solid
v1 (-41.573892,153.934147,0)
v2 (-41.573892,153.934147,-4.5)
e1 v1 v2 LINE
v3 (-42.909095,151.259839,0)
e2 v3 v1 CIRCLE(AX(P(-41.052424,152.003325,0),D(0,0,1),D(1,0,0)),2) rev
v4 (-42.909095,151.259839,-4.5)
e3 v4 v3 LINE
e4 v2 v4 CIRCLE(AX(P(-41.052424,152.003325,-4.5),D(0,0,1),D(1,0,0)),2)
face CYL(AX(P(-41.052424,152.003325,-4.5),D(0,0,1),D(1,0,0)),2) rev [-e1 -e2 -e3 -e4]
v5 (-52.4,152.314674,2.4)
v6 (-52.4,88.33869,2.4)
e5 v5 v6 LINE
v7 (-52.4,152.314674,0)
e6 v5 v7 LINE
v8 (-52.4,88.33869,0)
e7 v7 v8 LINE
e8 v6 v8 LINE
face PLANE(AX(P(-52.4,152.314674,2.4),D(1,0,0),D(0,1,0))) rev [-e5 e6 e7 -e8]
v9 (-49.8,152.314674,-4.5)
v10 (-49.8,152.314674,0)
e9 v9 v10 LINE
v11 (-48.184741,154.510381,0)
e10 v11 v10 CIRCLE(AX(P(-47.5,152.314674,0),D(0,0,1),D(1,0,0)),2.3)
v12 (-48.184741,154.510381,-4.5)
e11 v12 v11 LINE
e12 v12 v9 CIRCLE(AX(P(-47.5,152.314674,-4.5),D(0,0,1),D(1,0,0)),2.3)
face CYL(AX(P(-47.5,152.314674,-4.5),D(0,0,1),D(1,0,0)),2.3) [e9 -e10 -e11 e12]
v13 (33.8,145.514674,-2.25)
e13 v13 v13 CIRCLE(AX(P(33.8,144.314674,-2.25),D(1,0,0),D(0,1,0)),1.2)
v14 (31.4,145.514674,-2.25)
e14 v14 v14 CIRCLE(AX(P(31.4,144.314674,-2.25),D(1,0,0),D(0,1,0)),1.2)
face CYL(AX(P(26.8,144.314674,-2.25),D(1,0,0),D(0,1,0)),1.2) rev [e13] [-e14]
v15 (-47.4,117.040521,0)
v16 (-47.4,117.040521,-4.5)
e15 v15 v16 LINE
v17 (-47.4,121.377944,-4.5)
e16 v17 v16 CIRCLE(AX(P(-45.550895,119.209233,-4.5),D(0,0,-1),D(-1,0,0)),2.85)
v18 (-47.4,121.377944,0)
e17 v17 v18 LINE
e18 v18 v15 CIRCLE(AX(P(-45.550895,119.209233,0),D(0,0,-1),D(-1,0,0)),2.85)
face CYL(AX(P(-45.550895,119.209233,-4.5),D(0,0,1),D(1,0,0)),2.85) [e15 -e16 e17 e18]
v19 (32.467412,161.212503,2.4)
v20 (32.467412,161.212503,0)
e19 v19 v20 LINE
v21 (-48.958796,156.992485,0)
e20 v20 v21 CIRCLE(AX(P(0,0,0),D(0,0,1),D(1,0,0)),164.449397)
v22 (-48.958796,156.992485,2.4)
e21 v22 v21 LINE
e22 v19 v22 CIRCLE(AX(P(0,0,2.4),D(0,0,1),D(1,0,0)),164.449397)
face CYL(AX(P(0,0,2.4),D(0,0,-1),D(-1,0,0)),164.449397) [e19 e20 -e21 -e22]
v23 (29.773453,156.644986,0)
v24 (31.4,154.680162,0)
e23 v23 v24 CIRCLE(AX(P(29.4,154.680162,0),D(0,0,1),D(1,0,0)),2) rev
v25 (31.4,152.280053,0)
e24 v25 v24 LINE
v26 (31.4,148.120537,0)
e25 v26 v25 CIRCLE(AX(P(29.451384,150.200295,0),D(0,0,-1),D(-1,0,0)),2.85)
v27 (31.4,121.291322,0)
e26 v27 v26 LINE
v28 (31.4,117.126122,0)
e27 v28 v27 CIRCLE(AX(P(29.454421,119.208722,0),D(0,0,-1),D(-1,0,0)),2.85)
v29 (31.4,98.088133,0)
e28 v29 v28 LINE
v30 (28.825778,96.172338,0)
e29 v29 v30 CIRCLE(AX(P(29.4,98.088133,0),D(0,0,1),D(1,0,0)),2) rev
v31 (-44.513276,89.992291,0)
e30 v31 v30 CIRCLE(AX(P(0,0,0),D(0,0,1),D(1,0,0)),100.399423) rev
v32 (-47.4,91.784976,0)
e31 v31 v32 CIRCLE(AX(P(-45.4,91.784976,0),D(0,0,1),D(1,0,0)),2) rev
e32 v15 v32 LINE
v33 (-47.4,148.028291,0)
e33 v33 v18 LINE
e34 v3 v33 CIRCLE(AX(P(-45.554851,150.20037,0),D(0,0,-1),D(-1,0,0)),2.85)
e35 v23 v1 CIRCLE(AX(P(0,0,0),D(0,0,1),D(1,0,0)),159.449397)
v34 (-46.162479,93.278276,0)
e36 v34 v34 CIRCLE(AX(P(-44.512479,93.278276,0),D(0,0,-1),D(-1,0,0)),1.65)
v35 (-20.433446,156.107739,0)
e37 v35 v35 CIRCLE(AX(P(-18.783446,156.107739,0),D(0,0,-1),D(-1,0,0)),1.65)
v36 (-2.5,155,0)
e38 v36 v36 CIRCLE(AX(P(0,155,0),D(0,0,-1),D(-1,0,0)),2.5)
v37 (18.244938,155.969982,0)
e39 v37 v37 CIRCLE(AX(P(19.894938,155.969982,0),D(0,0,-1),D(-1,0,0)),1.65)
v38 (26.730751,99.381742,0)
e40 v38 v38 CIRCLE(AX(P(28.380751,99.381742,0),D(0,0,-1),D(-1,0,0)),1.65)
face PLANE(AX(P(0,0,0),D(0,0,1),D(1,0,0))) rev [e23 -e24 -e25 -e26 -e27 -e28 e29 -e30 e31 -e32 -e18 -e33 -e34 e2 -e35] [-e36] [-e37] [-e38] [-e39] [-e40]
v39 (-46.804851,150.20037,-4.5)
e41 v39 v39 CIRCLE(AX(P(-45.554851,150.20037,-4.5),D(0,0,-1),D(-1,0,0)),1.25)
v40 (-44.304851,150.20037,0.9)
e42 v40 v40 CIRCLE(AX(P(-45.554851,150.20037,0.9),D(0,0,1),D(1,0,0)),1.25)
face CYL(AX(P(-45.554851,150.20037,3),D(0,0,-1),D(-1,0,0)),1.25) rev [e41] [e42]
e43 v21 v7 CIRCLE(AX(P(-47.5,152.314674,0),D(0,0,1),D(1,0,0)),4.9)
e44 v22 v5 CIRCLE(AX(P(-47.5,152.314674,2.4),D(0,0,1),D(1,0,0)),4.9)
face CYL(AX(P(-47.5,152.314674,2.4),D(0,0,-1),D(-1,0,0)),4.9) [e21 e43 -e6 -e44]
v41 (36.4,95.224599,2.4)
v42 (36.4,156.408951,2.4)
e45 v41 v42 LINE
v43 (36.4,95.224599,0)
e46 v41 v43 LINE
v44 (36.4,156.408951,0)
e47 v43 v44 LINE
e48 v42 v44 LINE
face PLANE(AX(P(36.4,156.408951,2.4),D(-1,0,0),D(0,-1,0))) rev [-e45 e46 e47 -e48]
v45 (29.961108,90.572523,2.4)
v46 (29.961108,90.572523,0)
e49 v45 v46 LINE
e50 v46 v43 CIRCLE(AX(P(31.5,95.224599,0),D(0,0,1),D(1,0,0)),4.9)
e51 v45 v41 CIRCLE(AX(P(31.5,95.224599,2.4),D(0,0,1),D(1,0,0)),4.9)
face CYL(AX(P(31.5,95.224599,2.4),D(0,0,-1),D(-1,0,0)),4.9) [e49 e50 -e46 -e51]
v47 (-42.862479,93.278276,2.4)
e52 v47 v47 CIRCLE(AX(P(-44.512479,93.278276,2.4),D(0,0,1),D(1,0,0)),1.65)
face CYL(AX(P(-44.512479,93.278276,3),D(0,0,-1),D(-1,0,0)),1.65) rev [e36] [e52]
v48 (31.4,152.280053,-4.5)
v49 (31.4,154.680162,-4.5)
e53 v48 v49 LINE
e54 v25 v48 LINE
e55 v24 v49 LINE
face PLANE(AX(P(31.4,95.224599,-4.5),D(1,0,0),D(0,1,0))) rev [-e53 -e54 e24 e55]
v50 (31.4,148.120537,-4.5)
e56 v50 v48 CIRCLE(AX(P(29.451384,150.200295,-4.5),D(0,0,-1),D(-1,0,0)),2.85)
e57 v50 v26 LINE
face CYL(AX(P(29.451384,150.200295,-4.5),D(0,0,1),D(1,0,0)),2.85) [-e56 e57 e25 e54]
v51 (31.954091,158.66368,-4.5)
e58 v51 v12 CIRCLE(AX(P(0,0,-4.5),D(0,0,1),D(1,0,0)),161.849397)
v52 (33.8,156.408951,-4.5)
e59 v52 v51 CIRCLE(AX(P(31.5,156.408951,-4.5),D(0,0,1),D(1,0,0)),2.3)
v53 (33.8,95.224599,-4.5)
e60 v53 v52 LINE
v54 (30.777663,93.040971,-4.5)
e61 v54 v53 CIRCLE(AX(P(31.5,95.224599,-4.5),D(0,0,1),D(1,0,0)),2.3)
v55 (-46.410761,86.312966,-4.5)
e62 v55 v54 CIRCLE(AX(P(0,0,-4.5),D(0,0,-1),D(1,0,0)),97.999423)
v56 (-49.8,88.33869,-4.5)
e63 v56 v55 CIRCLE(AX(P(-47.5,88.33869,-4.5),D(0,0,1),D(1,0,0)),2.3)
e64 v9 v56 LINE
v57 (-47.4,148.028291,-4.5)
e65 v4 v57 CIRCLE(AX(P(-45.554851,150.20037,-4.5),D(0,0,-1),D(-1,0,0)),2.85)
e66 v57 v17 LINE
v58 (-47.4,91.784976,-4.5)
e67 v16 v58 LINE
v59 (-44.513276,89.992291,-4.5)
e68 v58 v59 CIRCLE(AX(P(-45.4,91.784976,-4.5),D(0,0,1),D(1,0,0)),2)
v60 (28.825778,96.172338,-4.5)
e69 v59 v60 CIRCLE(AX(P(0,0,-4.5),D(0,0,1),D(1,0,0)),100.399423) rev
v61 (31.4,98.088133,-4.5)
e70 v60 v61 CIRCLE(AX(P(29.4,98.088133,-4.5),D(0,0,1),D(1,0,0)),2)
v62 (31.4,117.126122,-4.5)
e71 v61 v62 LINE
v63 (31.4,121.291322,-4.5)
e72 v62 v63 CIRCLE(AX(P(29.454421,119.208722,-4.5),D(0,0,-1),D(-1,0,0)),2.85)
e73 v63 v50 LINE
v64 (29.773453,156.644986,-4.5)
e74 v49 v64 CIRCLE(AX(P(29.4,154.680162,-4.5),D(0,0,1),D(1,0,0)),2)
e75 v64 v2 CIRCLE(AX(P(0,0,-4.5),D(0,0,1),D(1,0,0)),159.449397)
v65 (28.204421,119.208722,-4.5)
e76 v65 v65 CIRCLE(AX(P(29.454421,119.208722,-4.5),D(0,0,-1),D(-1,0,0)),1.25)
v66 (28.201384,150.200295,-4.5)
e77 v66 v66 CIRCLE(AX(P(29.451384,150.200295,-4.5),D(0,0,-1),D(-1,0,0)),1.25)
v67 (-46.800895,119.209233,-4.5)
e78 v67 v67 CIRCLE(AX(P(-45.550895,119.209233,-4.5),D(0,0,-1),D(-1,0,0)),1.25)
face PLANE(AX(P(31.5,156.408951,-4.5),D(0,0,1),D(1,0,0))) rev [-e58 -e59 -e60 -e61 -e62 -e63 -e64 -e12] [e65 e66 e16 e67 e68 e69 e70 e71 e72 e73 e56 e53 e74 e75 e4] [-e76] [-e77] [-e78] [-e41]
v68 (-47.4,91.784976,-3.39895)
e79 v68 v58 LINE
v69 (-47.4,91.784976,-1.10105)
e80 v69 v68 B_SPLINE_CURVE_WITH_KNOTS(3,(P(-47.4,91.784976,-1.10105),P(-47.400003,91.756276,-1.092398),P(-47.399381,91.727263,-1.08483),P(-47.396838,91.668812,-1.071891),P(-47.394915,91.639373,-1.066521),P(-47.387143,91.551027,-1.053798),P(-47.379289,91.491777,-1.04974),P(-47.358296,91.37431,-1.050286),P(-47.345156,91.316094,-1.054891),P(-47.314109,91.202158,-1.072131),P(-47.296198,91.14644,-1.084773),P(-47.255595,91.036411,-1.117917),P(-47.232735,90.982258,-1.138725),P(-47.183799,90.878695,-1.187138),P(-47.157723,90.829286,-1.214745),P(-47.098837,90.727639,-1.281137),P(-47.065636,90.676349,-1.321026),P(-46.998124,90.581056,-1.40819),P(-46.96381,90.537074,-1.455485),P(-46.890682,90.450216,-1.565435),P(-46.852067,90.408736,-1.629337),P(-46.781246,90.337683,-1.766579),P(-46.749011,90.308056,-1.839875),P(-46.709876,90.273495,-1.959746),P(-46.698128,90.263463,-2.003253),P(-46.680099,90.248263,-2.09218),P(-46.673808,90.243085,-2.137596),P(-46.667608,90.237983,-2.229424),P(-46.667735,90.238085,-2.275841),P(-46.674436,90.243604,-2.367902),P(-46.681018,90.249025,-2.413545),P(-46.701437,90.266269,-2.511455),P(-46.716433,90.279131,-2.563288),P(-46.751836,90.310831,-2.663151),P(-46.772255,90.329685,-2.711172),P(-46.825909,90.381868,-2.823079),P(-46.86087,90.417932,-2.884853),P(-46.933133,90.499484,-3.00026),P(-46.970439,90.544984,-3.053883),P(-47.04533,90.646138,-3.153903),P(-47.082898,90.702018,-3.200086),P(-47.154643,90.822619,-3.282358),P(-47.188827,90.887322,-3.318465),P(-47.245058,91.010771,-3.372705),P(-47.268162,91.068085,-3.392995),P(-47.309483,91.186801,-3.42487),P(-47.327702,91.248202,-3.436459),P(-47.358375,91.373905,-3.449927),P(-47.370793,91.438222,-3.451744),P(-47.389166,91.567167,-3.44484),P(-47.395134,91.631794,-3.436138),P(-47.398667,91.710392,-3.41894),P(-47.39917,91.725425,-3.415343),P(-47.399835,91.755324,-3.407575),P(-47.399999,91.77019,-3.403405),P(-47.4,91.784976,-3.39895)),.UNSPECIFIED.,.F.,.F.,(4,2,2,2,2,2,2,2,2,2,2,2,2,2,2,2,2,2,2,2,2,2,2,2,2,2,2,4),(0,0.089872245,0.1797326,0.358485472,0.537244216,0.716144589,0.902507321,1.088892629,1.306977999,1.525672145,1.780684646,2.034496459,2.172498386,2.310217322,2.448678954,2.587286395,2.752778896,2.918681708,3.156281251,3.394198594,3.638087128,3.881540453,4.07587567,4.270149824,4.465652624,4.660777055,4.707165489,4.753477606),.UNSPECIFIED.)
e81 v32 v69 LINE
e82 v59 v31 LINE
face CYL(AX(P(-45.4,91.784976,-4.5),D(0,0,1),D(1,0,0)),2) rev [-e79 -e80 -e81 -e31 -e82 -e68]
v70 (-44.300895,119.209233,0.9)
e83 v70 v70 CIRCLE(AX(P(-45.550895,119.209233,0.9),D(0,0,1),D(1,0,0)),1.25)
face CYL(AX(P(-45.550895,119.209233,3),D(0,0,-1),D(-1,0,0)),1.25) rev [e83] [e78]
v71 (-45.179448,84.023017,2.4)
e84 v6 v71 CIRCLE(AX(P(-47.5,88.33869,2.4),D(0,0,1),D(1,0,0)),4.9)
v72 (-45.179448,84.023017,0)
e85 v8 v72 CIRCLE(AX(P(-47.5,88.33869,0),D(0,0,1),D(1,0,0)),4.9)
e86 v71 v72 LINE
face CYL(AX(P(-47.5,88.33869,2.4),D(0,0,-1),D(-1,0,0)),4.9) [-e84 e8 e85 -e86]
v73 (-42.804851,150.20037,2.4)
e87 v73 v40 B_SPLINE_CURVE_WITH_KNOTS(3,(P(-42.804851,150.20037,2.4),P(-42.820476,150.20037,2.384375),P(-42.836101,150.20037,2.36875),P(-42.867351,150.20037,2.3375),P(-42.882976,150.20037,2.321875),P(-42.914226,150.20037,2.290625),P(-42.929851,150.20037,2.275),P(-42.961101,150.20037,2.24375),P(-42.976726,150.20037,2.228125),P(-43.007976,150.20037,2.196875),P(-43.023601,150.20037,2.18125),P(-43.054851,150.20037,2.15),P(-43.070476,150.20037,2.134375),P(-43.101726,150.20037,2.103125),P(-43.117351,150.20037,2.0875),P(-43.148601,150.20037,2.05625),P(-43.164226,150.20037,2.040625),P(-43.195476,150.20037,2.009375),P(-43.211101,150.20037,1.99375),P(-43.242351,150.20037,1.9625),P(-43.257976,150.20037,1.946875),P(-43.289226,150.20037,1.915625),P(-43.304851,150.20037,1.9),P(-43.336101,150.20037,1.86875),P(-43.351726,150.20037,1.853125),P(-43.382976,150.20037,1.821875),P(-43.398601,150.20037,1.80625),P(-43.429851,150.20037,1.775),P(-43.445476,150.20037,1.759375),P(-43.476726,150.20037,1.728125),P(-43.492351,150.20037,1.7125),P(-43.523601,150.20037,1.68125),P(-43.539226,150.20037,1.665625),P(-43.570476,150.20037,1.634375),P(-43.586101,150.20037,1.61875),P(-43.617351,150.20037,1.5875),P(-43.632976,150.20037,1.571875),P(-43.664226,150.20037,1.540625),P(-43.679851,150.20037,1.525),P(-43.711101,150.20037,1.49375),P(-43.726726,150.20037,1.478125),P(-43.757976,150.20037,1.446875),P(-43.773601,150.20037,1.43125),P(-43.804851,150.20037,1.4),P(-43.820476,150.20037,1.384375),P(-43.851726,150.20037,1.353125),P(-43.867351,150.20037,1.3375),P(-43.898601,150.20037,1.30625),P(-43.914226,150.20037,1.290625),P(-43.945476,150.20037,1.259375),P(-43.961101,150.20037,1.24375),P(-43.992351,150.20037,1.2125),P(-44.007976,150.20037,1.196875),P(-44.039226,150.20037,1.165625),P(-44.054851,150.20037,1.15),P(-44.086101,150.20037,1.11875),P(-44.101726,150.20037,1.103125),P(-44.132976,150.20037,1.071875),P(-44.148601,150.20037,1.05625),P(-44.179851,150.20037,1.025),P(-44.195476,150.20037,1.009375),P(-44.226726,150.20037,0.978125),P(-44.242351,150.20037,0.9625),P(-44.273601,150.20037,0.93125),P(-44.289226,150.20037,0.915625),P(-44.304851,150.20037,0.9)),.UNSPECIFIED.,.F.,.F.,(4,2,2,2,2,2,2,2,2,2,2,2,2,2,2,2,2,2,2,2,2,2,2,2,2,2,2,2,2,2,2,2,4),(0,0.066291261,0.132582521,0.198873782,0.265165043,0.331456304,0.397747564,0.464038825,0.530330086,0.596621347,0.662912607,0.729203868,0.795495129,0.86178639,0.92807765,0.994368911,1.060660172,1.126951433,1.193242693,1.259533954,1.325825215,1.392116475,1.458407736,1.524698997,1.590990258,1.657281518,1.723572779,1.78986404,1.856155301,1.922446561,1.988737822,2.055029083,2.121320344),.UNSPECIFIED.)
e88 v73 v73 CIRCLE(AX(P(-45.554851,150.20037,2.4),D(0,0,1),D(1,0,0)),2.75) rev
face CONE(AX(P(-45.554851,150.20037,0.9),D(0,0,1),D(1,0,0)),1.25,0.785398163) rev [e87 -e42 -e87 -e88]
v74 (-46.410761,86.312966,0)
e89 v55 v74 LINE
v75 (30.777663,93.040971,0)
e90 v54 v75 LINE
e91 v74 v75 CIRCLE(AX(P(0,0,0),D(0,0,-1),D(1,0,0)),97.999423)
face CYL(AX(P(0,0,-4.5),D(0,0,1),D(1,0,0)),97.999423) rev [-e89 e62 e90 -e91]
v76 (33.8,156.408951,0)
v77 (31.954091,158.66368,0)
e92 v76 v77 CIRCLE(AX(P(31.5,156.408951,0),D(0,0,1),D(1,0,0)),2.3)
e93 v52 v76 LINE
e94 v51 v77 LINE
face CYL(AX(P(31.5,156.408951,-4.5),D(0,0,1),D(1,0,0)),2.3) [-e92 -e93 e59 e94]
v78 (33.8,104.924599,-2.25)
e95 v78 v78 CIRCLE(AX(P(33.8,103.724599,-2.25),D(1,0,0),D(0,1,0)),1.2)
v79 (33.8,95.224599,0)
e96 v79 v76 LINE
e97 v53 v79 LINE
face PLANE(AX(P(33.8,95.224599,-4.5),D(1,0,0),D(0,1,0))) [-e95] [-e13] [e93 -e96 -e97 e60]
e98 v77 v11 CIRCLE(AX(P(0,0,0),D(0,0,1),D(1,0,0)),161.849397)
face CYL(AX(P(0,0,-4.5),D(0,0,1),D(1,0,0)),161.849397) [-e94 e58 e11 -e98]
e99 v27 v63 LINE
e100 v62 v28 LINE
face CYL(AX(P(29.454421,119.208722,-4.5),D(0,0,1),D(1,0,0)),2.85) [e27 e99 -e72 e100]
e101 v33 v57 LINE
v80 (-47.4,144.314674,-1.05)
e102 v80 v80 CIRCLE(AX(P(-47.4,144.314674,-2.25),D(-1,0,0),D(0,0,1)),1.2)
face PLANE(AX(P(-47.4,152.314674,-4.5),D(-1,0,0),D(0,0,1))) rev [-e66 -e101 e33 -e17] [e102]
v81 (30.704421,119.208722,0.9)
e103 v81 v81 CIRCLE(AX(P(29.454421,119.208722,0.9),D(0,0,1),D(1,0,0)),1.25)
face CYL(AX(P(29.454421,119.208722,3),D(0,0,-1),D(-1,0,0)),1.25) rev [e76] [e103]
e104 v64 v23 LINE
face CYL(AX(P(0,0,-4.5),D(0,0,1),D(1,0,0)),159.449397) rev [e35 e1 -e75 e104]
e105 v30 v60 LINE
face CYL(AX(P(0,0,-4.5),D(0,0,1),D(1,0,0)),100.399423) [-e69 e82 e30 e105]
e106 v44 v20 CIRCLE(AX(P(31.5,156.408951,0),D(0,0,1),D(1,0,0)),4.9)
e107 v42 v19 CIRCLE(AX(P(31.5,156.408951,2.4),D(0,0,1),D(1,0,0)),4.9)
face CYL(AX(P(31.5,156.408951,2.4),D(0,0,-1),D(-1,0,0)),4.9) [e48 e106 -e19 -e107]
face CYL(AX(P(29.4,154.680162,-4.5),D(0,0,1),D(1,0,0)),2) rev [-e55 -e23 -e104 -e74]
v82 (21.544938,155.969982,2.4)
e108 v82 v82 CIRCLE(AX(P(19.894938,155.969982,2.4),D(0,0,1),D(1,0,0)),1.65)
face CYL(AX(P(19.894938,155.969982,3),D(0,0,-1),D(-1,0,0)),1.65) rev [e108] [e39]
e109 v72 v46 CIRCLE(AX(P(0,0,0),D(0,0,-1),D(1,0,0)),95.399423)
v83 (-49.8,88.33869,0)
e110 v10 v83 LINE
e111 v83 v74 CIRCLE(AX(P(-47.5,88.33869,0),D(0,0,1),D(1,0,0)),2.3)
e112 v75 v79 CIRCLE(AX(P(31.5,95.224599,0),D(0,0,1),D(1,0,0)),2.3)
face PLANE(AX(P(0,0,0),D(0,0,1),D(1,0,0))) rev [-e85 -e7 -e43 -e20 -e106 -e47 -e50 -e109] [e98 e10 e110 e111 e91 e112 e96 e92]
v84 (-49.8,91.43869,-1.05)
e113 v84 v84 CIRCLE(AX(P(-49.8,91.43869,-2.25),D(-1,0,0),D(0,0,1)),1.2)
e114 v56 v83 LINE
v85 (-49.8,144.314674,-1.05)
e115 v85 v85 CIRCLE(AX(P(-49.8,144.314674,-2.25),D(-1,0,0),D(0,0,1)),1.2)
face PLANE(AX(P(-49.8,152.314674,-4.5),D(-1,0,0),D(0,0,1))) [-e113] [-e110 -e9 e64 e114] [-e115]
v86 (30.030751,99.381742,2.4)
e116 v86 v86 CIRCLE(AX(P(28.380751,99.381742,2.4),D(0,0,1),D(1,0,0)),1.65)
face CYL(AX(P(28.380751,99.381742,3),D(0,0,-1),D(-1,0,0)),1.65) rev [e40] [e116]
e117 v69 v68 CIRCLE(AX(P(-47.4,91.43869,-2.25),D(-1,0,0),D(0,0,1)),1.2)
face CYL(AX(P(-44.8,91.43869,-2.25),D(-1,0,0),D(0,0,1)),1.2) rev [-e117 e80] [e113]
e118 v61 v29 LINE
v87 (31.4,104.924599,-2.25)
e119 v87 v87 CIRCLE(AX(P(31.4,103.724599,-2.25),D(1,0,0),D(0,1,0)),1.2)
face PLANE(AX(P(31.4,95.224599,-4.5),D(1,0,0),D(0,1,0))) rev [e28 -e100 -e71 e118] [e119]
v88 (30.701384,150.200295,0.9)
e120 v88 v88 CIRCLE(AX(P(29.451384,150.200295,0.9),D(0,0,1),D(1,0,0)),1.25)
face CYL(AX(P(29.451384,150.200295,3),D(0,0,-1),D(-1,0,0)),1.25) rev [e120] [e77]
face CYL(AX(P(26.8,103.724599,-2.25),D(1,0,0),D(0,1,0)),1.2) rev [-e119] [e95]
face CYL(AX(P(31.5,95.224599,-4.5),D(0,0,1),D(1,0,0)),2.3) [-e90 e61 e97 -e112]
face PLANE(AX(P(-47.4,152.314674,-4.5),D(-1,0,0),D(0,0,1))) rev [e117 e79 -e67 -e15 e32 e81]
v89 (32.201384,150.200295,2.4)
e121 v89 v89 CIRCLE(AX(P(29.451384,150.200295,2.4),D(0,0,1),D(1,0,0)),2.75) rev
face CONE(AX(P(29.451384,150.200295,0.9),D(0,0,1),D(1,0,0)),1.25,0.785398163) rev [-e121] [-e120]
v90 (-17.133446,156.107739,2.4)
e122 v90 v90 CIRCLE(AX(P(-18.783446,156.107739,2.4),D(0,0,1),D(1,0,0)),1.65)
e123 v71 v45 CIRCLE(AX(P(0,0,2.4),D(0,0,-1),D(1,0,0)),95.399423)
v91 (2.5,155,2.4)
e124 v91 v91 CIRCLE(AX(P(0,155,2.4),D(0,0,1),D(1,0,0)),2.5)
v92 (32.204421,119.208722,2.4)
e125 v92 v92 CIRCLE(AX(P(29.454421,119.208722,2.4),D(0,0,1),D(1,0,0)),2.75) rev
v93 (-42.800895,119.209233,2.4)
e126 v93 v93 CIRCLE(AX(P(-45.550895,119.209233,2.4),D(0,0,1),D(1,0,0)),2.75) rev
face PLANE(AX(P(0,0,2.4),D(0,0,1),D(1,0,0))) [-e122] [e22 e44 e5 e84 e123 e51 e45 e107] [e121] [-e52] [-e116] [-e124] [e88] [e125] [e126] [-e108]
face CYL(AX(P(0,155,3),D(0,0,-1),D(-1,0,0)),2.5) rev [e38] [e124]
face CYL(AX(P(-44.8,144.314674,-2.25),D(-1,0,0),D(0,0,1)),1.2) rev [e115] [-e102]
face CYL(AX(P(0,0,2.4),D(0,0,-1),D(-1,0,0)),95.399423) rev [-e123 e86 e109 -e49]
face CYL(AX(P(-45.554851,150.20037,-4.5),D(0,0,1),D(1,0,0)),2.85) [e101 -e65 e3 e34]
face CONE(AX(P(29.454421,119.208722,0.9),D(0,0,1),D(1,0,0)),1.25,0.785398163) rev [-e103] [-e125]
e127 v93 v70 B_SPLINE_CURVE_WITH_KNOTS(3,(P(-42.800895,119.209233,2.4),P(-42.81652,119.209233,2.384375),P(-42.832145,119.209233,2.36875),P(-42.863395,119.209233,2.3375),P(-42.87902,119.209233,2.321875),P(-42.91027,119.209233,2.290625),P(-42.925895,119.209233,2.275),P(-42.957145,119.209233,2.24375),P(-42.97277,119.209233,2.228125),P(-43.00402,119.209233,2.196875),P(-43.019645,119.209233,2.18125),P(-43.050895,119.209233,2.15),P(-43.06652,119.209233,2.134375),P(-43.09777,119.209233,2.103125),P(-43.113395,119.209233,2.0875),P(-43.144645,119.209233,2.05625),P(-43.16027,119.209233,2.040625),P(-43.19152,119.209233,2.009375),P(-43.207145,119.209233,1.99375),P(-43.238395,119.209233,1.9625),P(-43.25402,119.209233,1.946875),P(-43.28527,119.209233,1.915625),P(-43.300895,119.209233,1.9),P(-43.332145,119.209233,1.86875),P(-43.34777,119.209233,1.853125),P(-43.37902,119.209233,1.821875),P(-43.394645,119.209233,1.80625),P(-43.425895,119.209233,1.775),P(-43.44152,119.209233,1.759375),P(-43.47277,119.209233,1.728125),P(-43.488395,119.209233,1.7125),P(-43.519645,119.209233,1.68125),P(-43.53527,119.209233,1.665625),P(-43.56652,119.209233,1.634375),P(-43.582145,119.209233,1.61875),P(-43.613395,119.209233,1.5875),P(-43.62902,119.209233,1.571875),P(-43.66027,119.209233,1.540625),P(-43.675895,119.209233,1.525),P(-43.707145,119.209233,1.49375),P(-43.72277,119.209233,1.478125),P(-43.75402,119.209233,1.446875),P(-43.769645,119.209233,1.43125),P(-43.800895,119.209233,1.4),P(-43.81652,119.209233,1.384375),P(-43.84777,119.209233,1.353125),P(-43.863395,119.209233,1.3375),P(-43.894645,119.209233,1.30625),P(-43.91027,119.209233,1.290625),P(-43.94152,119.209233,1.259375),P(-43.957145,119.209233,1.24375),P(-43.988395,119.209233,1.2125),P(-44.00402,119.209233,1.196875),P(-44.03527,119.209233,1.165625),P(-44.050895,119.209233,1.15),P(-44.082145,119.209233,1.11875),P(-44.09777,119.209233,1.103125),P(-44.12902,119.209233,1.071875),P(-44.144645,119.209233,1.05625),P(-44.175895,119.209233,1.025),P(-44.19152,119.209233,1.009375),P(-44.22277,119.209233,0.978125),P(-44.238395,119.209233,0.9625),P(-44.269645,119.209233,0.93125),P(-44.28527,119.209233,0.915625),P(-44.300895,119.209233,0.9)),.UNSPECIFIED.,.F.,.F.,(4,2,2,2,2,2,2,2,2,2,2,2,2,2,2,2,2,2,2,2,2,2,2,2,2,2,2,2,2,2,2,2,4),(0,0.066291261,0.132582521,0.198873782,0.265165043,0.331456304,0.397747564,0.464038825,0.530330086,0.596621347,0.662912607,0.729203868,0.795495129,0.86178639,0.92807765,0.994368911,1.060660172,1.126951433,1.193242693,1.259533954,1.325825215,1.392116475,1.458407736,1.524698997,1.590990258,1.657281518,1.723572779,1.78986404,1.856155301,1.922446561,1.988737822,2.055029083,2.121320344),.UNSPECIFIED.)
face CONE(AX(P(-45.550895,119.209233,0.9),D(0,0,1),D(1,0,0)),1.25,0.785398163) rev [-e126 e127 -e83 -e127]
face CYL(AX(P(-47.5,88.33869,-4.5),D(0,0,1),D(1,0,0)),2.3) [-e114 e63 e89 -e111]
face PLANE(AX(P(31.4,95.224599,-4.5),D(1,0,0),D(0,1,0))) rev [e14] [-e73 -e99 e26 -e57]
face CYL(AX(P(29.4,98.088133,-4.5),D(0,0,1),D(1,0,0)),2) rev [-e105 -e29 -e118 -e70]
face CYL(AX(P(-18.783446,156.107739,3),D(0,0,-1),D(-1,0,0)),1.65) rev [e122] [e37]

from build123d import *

# Parameters (mm, degrees)
EXTRUDE_446_DEPTH      = 4.5
EXTRUDE_871_DEPTH      = 2.4
SKETCH_7_R             = 1.25
SKETCH_7_R_2           = 2.5
CUT_EXTRUDE_1133_DEPTH = 3
CHAMFER_1178_SIZE      = 1.5
EXTRUDE_START          = 4.5
SKETCH_8_R             = 2.85
SKETCH_8_R_2           = 1.25
EXTRUDE_1547_DEPTH     = 4.5
SKETCH_9_R             = 1.65
CUT_EXTRUDE_1826_DEPTH = 3
SKETCH_13_R            = 1.2
CUT_EXTRUDE_2013_DEPTH = 5
CUT_EXTRUDE_START      = -7
SKETCH_14_R            = 1.2
CUT_EXTRUDE_2216_DEPTH = 7
FILLET_2261_R          = 2


with BuildPart() as part:
    # Эскиз1 → Extrude 446 (new body)
    with BuildSketch(Plane.XY):
        with BuildLine():
            ThreePointArc((-48.184740917, 154.510381185), (-49.352687792, 153.677592944), (-49.8, 152.314674038))
            Line((-49.8, 152.314674038), (-49.8, 88.338690467))
            ThreePointArc((-49.8, 88.338690467), (-48.67998968, 86.364450269), (-46.41076143, 86.312966069))
            ThreePointArc((-46.41076143, 86.312966069), (-8.509697807, 97.629257558), (30.777662843, 93.040971394))
            ThreePointArc((30.777662843, 93.040971394), (32.846964094, 93.360279245), (33.8, 95.224598888))
            Line((33.8, 95.224598888), (33.8, 156.408950918))
            ThreePointArc((33.8, 156.408950918), (33.279664307, 157.865932371), (31.954091345, 158.663679516))
            ThreePointArc((31.954091345, 158.663679516), (-8.376811335, 161.632472551), (-48.184740917, 154.510381185))
        make_face()
        with BuildLine():
            Line((-47.4, 152.241091851), (-47.4, 88.505842281))
            ThreePointArc((-47.4, 88.505842281), (-8.703725392, 100.021444112), (31.4, 95.362907453))
            Line((31.4, 95.362907453), (31.4, 156.32706115))
            ThreePointArc((31.4, 156.32706115), (-8.256741868, 159.235474256), (-47.4, 152.241091851))
        make_face(mode=Mode.SUBTRACT)
    extrude(amount=-EXTRUDE_446_DEPTH)

    # Эскиз2 → Extrude 871 (add)
    with BuildSketch(Plane.XY):
        with BuildLine():
            Line((-52.4, 152.314674038), (-52.4, 88.338690467))
            ThreePointArc((-52.4, 88.338690467), (-50.013891057, 84.132700481), (-45.179448263, 84.023016749))
            ThreePointArc((-45.179448263, 84.023016749), (-8.283928985, 95.039078329), (29.961107796, 90.572522923))
            ThreePointArc((29.961107796, 90.572522923), (34.369619156, 91.252787475), (36.4, 95.224598888))
            Line((36.4, 95.224598888), (36.4, 156.408950918))
            ThreePointArc((36.4, 156.408950918), (35.291458741, 159.512954882), (32.467411995, 161.212503148))
            ThreePointArc((32.467411995, 161.212503148), (-8.511379087, 164.228987816), (-48.958795866, 156.992484917))
            ThreePointArc((-48.958795866, 156.992484917), (-51.447030513, 155.218283882), (-52.4, 152.314674038))
        make_face()
    extrude(amount=EXTRUDE_871_DEPTH)

    # Эскиз7 → Cut-Extrude 1133 (cut)
    with BuildSketch(Plane(origin=(0, 0, 0), x_dir=(-1, 0, 0), z_dir=(0, 0, -1))):
        with Locations((-29.451383649, 150.200294851)):
            Circle(SKETCH_7_R)
        with Locations((45.554851126, 150.200369953)):
            Circle(SKETCH_7_R)
        with Locations((45.55089452, 119.209232592)):
            Circle(SKETCH_7_R)
        with Locations((-29.454420734, 119.20872198)):
            Circle(SKETCH_7_R)
        with Locations((0, 155)):
            Circle(SKETCH_7_R_2)
    extrude(amount=-CUT_EXTRUDE_1133_DEPTH, mode=Mode.SUBTRACT)

    # Chamfer 1178
    chamfer_1178_edges = [part.edges().sort_by_distance(p)[0] for p in [
        (30.704420734, 119.20872198, 2.4),
        (-44.30089452, 119.209232592, 2.4),
        (-44.304851126, 150.200369953, 2.4),
        (30.701383649, 150.200294851, 2.4),
    ]]
    chamfer(chamfer_1178_edges, length=CHAMFER_1178_SIZE)

    # Эскиз8 → Extrude 1547 (add)
    # profile 1 of 4: a face of its own
    with BuildSketch(Plane(origin=(0, 0, 0), x_dir=(-1, 0, 0), z_dir=(0, 0, -1)).offset(EXTRUDE_START)):
        with Locations((-29.454420734, 119.20872198)):
            Circle(SKETCH_8_R)
        with Locations((-29.454420734, 119.20872198)):
            Circle(SKETCH_8_R_2, mode=Mode.SUBTRACT)
    # profile 2 of 4: a face of its own
    with BuildSketch(Plane(origin=(0, 0, 0), x_dir=(-1, 0, 0), z_dir=(0, 0, -1)).offset(EXTRUDE_START)):
        with Locations((-29.451383649, 150.200294851)):
            Circle(SKETCH_8_R)
        with Locations((-29.451383649, 150.200294851)):
            Circle(SKETCH_8_R_2, mode=Mode.SUBTRACT)
    # profile 3 of 4: a face of its own
    with BuildSketch(Plane(origin=(0, 0, 0), x_dir=(-1, 0, 0), z_dir=(0, 0, -1)).offset(EXTRUDE_START)):
        with Locations((45.55089452, 119.209232592)):
            Circle(SKETCH_8_R)
        with Locations((45.55089452, 119.209232592)):
            Circle(SKETCH_8_R_2, mode=Mode.SUBTRACT)
    # profile 4 of 4: a face of its own
    with BuildSketch(Plane(origin=(0, 0, 0), x_dir=(-1, 0, 0), z_dir=(0, 0, -1)).offset(EXTRUDE_START)):
        with Locations((45.554851126, 150.200369953)):
            Circle(SKETCH_8_R)
        with Locations((45.554851126, 150.200369953)):
            Circle(SKETCH_8_R_2, mode=Mode.SUBTRACT)
    extrude(amount=-EXTRUDE_1547_DEPTH)

    # Эскиз9 → Cut-Extrude 1826 (cut)
    with BuildSketch(Plane(origin=(0, 0, 0), x_dir=(-1, 0, 0), z_dir=(0, 0, -1))):
        with Locations((-28.380750513, 99.381741539)):
            Circle(SKETCH_9_R)
        with Locations((44.512478568, 93.278276156)):
            Circle(SKETCH_9_R)
        with Locations((-19.894937989, 155.969982116)):
            Circle(SKETCH_9_R)
        with Locations((18.78344627, 156.107738518)):
            Circle(SKETCH_9_R)
    extrude(amount=-CUT_EXTRUDE_1826_DEPTH, mode=Mode.SUBTRACT)

    # Эскиз13 → Cut-Extrude 2013 (cut)
    with BuildSketch(Plane.ZY.offset(49.8)):
        with Locations((-2.25, 144.314674038)):
            Circle(SKETCH_13_R)
        with Locations((-2.25, 91.438690467)):
            Circle(SKETCH_13_R)
    extrude(amount=-CUT_EXTRUDE_2013_DEPTH, mode=Mode.SUBTRACT)

    # Эскиз14 → Cut-Extrude 2216 (cut)
    with BuildSketch(Plane(origin=(33.8, 0, 0), x_dir=(0, 0, -1), z_dir=(1, 0, 0)).offset(CUT_EXTRUDE_START)):
        with Locations(Location((2.25, 144.314674038, 0), (0, 0, 180))):
            Circle(SKETCH_14_R)
        with Locations(Location((2.25, 103.724598888, 0), (0, 0, 90))):
            Circle(SKETCH_14_R)
    extrude(amount=CUT_EXTRUDE_2216_DEPTH, mode=Mode.SUBTRACT)

    # Fillet 2261
    # the kernel refuses this fillet: 2 mm, written as the material it adds along each edge
    with BuildSketch(Plane(origin=(-44.944004027, 152.98413823, -4.5), x_dir=(0.9624896485032316, 0.2713184043225332, 0), z_dir=(0, 0, 1))) as fillet_2261_piece_1:
        with BuildLine():
            CenterArc((3.479493085, -1.99987944), FILLET_2261_R, 89.370889764, 96.709553608)
            ThreePointArc((1.490744771, -2.21172878), (1.020072901, -0.920711328), (0, 0))
            ThreePointArc((0, 0), (1.750726367, 0.009611624), (3.501452734, 0))
        make_face()
    extrude(amount=4.5)
    with BuildSketch(Plane(origin=(31.4, 156.32706115, 0), x_dir=(0, -1, 0), z_dir=(0, 0, -1))) as fillet_2261_piece_2:
        with BuildLine():
            CenterArc((1.646899326, 2), FILLET_2261_R, 190.761817139, 79.238182861)
            ThreePointArc((-0.317924487, 1.626546679), (-0.16107556, 0.812860271), (0, 0))
            Line((0, 0), (1.646899326, 0))
        make_face()
    extrude(amount=4.5)
    with BuildSketch(Plane(origin=(31.4, 95.362907453, 0), x_dir=(0, 1, 0), z_dir=(0, 0, -1))) as fillet_2261_piece_3:
        with BuildLine():
            CenterArc((2.725225415, -2), FILLET_2261_R, 90, 106.685074195)
            ThreePointArc((0.809430773, -2.574221986), (0.413364342, -1.284391441), (0, 0))
            Line((0, 0), (2.725225415, 0))
        make_face()
    extrude(amount=4.5)
    with BuildSketch(Plane(origin=(-47.4, 88.505842281, 0), x_dir=(0.889056274455369, 0.45779792578335204, 0), z_dir=(0, 0, -1))) as fillet_2261_piece_4_section:
        with BuildLine():
            CenterArc((3.279293139, -1.999738508), FILLET_2261_R, 90.92652325, 116.318579463)
            Line((1.50118059, -2.91533436), (0, 0))
            ThreePointArc((0, 0), (1.623476393, -0.013126808), (3.246952786, 0))
        make_face()
    fillet_2261_piece_4 = extrude(amount=4.5, mode=Mode.PRIVATE)
    fillet_2261_piece_4 = fillet_2261_piece_4 - Plane(origin=(-46.674755075, 91.438690467, -2.25), x_dir=(0, 0, 1), z_dir=(-1, 0, 0)) * Cylinder(1.2, 22, mode=Mode.PRIVATE)
    add(fillet_2261_piece_4)


solid = part.part
